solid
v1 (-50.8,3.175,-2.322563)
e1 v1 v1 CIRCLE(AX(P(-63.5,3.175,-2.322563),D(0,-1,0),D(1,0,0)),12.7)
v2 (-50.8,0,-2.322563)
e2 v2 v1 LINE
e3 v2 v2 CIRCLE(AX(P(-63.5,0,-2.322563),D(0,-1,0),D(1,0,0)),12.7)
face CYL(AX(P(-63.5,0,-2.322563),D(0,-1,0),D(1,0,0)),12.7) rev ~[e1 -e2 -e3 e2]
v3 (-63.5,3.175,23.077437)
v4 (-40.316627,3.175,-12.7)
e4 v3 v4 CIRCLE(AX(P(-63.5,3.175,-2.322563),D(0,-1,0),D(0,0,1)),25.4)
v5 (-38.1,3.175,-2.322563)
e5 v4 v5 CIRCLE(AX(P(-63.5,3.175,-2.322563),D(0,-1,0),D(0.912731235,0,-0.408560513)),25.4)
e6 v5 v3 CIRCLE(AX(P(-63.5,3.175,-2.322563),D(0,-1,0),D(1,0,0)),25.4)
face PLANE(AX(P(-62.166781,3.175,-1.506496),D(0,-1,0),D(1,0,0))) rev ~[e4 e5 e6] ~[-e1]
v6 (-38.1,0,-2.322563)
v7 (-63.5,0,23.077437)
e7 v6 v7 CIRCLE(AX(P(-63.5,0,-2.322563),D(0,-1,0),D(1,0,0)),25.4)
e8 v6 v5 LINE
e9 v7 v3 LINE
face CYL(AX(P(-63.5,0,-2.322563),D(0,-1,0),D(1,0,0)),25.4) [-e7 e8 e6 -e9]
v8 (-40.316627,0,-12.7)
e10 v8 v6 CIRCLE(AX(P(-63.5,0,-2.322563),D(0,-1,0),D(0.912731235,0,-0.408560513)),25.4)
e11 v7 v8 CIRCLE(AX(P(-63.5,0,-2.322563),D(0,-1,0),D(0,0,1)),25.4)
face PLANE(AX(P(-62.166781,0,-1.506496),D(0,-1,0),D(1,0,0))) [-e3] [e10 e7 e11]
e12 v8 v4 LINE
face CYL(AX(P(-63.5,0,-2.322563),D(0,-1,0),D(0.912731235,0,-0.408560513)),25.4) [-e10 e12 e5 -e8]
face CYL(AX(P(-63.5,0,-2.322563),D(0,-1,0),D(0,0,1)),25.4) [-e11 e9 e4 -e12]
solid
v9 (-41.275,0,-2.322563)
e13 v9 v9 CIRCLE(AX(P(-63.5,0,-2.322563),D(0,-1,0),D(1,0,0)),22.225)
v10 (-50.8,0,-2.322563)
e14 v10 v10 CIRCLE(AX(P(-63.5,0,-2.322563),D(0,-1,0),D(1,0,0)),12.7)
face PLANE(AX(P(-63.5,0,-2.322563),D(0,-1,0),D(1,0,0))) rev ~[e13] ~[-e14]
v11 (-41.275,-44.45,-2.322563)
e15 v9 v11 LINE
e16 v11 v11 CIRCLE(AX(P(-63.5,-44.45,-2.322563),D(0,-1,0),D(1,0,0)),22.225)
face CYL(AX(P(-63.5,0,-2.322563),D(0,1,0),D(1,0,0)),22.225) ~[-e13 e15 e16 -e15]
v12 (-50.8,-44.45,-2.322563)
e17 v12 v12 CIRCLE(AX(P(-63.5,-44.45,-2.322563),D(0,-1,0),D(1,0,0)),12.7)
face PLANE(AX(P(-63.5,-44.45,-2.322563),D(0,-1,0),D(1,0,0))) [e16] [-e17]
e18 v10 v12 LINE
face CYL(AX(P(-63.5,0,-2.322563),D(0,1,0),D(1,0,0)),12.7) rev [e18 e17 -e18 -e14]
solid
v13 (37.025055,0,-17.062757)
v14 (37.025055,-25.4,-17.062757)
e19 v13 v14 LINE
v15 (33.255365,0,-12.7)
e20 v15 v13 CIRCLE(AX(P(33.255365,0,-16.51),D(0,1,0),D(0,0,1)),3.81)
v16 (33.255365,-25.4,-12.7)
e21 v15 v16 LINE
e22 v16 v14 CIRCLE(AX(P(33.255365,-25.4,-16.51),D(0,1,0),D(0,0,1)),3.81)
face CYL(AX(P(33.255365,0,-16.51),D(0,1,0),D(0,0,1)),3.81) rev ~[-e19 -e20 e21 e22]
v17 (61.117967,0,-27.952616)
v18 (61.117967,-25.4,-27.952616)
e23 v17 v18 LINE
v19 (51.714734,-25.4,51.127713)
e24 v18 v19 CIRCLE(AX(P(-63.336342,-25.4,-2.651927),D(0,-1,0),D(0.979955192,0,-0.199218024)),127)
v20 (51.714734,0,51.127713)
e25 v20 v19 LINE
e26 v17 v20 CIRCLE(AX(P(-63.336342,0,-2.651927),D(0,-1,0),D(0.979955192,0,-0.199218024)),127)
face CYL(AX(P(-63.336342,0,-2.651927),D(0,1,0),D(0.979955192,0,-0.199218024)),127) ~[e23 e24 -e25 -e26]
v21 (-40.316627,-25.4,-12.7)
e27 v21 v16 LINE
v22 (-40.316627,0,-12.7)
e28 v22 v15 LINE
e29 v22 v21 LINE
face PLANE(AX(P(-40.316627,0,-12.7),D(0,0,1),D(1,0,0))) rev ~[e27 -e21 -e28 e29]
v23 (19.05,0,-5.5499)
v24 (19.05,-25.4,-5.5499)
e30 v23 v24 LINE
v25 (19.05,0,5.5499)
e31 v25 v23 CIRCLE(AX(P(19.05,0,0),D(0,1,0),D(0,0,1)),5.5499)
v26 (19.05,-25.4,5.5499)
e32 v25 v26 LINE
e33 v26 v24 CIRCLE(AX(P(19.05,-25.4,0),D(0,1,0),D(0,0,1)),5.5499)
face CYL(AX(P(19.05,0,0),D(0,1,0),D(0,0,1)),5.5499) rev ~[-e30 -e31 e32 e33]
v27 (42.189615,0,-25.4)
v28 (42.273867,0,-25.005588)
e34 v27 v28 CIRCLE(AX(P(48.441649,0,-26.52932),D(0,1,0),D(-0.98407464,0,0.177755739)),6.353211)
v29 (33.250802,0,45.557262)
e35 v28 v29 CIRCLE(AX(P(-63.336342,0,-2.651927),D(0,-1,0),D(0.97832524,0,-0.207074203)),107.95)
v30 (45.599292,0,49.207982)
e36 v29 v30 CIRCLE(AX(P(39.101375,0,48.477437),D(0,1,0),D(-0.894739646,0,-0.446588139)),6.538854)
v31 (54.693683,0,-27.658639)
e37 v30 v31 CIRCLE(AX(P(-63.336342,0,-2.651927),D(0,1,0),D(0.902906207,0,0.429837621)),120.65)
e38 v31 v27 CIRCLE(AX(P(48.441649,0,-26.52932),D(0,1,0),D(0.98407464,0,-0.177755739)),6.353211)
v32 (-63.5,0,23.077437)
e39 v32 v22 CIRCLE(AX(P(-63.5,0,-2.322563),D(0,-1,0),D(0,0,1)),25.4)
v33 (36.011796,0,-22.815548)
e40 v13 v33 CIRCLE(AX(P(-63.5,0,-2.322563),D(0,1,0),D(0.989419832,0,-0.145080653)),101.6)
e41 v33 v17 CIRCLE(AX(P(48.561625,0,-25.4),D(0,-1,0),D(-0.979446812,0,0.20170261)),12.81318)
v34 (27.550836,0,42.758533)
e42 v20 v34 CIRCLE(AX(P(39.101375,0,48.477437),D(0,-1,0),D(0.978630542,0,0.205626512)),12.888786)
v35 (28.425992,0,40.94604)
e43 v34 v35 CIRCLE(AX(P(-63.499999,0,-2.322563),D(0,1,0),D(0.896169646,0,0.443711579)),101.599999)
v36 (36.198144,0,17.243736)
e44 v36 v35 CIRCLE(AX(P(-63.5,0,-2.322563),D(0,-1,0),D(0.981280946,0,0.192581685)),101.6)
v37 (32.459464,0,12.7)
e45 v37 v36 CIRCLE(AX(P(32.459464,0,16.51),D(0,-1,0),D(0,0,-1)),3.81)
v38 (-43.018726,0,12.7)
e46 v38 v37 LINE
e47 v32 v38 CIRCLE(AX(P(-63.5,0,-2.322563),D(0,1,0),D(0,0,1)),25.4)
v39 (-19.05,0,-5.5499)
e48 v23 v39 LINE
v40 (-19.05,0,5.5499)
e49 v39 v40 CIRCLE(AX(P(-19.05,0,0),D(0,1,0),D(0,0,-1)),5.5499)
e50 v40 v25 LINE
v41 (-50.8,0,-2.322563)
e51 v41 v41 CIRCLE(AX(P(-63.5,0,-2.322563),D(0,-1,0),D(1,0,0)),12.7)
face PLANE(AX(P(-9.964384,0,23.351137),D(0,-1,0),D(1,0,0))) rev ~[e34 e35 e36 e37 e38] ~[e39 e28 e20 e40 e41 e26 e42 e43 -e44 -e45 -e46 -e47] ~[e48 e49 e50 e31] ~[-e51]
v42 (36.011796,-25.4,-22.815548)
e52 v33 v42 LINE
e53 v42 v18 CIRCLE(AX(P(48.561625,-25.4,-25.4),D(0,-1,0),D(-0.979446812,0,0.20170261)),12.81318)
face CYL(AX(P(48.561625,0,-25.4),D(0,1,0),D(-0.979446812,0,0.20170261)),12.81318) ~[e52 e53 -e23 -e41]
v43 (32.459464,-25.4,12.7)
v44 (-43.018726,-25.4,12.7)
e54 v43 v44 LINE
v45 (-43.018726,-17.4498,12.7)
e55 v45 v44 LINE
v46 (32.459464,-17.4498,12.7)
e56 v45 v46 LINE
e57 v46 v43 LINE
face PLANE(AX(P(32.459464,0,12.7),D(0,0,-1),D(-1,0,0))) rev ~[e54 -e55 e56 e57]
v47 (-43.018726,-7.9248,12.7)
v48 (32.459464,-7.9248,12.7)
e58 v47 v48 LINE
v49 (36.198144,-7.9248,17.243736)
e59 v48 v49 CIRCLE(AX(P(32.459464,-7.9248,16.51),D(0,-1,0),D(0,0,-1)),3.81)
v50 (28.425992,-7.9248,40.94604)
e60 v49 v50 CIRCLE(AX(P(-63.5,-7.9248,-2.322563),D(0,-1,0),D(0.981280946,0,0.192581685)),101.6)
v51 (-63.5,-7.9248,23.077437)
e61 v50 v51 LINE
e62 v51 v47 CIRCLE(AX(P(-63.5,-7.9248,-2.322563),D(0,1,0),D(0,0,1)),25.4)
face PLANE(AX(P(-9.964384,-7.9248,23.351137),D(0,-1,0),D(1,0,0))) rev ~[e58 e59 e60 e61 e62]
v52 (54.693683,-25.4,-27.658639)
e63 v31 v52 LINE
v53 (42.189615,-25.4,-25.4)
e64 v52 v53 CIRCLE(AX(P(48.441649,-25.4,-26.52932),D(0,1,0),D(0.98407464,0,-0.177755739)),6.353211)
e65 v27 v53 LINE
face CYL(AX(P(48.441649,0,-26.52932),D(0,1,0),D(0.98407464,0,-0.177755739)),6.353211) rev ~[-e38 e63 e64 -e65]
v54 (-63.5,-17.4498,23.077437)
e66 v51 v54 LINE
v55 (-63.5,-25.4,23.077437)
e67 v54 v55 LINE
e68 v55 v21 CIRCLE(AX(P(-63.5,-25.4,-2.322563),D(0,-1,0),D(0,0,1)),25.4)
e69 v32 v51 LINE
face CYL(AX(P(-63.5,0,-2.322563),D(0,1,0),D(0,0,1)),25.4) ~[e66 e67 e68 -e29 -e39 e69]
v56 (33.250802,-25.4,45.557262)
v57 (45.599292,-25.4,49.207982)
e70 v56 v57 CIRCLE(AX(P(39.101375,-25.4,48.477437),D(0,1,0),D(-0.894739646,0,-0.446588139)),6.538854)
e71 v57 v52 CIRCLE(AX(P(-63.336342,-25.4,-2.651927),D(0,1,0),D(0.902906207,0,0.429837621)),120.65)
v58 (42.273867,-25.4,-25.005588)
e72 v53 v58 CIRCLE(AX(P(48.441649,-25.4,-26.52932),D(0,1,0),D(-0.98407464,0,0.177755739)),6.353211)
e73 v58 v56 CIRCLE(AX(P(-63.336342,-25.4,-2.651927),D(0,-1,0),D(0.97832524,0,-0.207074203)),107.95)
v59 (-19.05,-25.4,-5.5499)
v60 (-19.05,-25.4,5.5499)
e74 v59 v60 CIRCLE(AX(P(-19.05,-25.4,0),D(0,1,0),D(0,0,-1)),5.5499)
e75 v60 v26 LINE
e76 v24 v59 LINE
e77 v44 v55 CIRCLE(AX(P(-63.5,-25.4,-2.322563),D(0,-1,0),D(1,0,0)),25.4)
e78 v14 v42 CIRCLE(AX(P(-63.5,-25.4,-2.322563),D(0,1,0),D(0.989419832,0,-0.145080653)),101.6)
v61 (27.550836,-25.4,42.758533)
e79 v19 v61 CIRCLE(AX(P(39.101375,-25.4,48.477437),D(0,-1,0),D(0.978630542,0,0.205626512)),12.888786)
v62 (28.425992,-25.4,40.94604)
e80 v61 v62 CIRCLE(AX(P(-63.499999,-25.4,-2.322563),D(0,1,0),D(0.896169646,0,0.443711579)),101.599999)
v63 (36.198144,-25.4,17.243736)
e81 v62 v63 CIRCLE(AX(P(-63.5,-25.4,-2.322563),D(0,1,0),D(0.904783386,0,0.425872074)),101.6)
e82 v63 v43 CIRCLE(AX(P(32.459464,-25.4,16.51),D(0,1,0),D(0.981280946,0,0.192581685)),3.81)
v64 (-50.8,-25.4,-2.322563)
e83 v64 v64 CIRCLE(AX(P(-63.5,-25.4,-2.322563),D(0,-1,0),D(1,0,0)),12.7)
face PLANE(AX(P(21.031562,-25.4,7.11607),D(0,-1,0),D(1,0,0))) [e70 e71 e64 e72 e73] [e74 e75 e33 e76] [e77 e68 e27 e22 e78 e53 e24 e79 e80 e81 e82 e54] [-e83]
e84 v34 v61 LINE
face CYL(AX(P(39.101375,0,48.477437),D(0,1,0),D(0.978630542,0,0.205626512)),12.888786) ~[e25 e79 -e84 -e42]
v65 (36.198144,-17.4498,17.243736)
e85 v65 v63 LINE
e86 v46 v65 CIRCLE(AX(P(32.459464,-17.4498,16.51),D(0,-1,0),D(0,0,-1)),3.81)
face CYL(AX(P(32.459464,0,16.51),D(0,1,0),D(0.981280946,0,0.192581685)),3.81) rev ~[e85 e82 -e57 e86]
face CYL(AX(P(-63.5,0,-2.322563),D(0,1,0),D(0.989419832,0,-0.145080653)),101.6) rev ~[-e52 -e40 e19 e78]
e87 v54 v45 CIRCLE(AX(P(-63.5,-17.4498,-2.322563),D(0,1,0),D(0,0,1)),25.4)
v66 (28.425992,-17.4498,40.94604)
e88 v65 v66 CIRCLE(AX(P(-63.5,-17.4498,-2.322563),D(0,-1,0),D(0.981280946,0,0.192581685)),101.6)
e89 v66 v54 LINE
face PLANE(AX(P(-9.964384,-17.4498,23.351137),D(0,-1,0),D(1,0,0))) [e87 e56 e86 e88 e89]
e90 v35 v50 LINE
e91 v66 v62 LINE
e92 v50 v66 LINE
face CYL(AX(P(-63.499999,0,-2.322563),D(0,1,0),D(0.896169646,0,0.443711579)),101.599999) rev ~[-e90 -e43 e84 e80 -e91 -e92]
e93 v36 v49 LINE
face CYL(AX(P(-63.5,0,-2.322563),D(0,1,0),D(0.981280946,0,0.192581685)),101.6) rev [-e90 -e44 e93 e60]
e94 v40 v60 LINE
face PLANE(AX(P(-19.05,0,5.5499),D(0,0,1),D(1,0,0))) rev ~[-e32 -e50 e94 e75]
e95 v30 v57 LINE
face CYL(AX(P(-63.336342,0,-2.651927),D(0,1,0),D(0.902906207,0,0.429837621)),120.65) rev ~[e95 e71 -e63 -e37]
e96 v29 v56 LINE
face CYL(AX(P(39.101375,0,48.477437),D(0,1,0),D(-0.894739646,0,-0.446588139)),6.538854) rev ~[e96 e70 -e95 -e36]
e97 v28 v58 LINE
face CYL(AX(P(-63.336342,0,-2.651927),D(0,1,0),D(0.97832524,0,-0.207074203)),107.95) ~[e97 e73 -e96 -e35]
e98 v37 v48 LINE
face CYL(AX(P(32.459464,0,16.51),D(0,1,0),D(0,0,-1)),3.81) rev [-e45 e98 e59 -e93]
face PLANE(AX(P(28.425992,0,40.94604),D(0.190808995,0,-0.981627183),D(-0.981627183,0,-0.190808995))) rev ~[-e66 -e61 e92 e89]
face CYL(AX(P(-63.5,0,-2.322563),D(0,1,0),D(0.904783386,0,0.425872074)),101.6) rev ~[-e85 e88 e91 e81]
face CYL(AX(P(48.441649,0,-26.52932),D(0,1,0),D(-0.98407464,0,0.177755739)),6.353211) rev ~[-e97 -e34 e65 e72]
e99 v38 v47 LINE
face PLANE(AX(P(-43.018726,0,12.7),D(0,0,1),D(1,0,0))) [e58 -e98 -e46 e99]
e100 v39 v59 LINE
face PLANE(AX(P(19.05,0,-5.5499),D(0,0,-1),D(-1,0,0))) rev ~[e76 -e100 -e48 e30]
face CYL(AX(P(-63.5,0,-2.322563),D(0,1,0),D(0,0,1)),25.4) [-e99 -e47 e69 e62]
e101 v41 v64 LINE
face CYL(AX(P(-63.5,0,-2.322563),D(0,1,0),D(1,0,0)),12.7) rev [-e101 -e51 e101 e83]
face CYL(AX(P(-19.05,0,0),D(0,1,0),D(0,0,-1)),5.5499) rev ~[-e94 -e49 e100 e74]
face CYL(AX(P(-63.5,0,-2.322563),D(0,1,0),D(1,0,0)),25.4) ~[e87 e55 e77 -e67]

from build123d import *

# Parameters (mm, degrees)
F0_R     = 22.225
F0_R_2   = 12.7
F1_DEPTH = 25.4
F2_DEPTH = 44.45
F3_DEPTH = 3.175
F4_DEPTH = 17.4498
F5_DEPTH = 7.9248


with BuildPart() as f1:
    # F0 (on Front) → F1 (new body)
    with BuildSketch(Plane.XZ):
        with BuildLine():
            Line((28.6733515832, 12.7), (-43.0187255819, 12.7))
            ThreePointArc((-43.0187255819, 12.7), (-39.3609821014, 5.5810953524), (-38.1, -2.3225629708))
            ThreePointArc((-38.1, -2.3225629708), (-38.6603373258, -7.6283294781), (-40.3166266323, -12.7))
            Line((-40.3166266323, -12.7), (28.6733515832, -12.7))
            Line((28.6733515832, -12.7), (33.2553653837, -12.7))
            ThreePointArc((33.2553653837, -12.7), (36.1382550159, -14.0190067506), (37.0250549441, -17.0627572869))
            ThreePointArc((37.0250549441, -17.0627572869), (36.5597775982, -19.9464361831), (36.0117960852, -22.8155481096))
            ThreePointArc((36.0117960852, -22.8155481096), (45.993088379, -37.9530956056), (61.1179671118, -27.9526164488))
            ThreePointArc((61.1179671118, -27.9526164488), (62.7752437383, 12.3436674732), (51.7147344593, 51.1277131392))
            ThreePointArc((51.7147344593, 51.1277131392), (34.8831774474, 60.656419548), (27.5508360528, 42.7585334455))
            ThreePointArc((27.5508360528, 42.7585334455), (27.9929024003, 41.8544537956), (28.4259920573, 40.9460397831))
            ThreePointArc((28.4259920573, 40.9460397831), (33.0422300736, 29.3343132556), (36.198144095, 17.2437362196))
            ThreePointArc((36.198144095, 17.2437362196), (35.4015407636, 14.0891979632), (32.4594636915, 12.7))
            Line((32.4594636915, 12.7), (28.6733515832, 12.7))
        make_face()
        with BuildLine():
            Line((-19.05, 5.5499), (19.05, 5.5499))
            ThreePointArc((19.05, 5.5499), (24.5999, 0), (19.05, -5.5499))
            Line((19.05, -5.5499), (-19.05, -5.5499))
            ThreePointArc((-19.05, -5.5499), (-24.5999, 0), (-19.05, 5.5499))
        make_face(mode=Mode.SUBTRACT)
        with BuildLine():
            ThreePointArc((45.5992916154, 49.2079816191), (56.4779805656, 11.5237748752), (54.6936829038, -27.6586394588))
            ThreePointArc((54.6936829038, -27.6586394588), (47.3123292859, -32.7813536179), (42.1896151268, -25.4))
            ThreePointArc((42.1896151268, -25.4), (42.2286106989, -25.2021250663), (42.2738673123, -25.0055875814))
            ThreePointArc((42.2738673123, -25.0055875814), (43.7417669199, 11.0404436441), (33.2508024974, 45.5572621802))
            ThreePointArc((33.2508024974, 45.5572621802), (37.2475404836, 54.7479964973), (45.5992916154, 49.2079816191))
        make_face(mode=Mode.SUBTRACT)
        with BuildLine():
            ThreePointArc((-38.1, -2.3225629708), (-39.3609821014, 5.5810953524), (-43.0187255819, 12.7))
            ThreePointArc((-43.0187255819, 12.7), (-52.0198671492, 20.3350306731), (-63.5, 23.0774370292))
            ThreePointArc((-63.5, 23.0774370292), (-84.8160373961, -16.1351134134), (-40.3166266323, -12.7))
            ThreePointArc((-40.3166266323, -12.7), (-38.6603373258, -7.6283294781), (-38.1, -2.3225629708))
        make_face()
        with Locations((-63.5, -2.3225629708)):
            Circle(F0_R, mode=Mode.SUBTRACT)
        with Locations((-63.5, -2.3225629708)):
            Circle(F0_R)
        with Locations((-63.5, -2.3225629708)):
            Circle(F0_R_2, mode=Mode.SUBTRACT)
    extrude(amount=F1_DEPTH)

    # F0 (on Front) → F4 (join)
    with BuildSketch(Plane.XZ):
        with BuildLine():
            ThreePointArc((-63.5, 23.0774370292), (-52.0198671492, 20.3350306731), (-43.0187255819, 12.7))
            Line((-43.0187255819, 12.7), (28.6733515832, 12.7))
            Line((28.6733515832, 12.7), (32.4594636915, 12.7))
            ThreePointArc((32.4594636915, 12.7), (35.4015407636, 14.0891979632), (36.198144095, 17.2437362196))
            ThreePointArc((36.198144095, 17.2437362196), (33.0422300736, 29.3343132556), (28.4259920573, 40.9460397831))
            Line((28.4259920573, 40.9460397831), (-63.5, 23.0774370292))
        make_face()
    extrude(amount=F4_DEPTH)

    # F0 (on Front) → F5 (cut)
    with BuildSketch(Plane.XZ):
        with BuildLine():
            ThreePointArc((-63.5, 23.0774370292), (-52.0198671492, 20.3350306731), (-43.0187255819, 12.7))
            Line((-43.0187255819, 12.7), (28.6733515832, 12.7))
            Line((28.6733515832, 12.7), (32.4594636915, 12.7))
            ThreePointArc((32.4594636915, 12.7), (35.4015407636, 14.0891979632), (36.198144095, 17.2437362196))
            ThreePointArc((36.198144095, 17.2437362196), (33.0422300736, 29.3343132556), (28.4259920573, 40.9460397831))
            Line((28.4259920573, 40.9460397831), (-63.5, 23.0774370292))
        make_face()
    extrude(amount=F5_DEPTH, mode=Mode.SUBTRACT)


with BuildPart() as f2:
    # F0 (on Front) → F2 (new body)
    with BuildSketch(Plane.XZ):
        with Locations((-63.5, -2.3225629708)):
            Circle(F0_R)
        with Locations((-63.5, -2.3225629708)):
            Circle(F0_R_2, mode=Mode.SUBTRACT)
    extrude(amount=F2_DEPTH)


with BuildPart() as f3:
    # F0 (on Front) → F3 (new body)
    with BuildSketch(Plane.XZ):
        with BuildLine():
            ThreePointArc((-38.1, -2.3225629708), (-39.3609821014, 5.5810953524), (-43.0187255819, 12.7))
            ThreePointArc((-43.0187255819, 12.7), (-52.0198671492, 20.3350306731), (-63.5, 23.0774370292))
            ThreePointArc((-63.5, 23.0774370292), (-84.8160373961, -16.1351134134), (-40.3166266323, -12.7))
            ThreePointArc((-40.3166266323, -12.7), (-38.6603373258, -7.6283294781), (-38.1, -2.3225629708))
        make_face()
        with Locations((-63.5, -2.3225629708)):
            Circle(F0_R, mode=Mode.SUBTRACT)
        with Locations((-63.5, -2.3225629708)):
            Circle(F0_R)
        with Locations((-63.5, -2.3225629708)):
            Circle(F0_R_2, mode=Mode.SUBTRACT)
    extrude(amount=-F3_DEPTH)


solid = Compound([f1.part, f2.part, f3.part])
